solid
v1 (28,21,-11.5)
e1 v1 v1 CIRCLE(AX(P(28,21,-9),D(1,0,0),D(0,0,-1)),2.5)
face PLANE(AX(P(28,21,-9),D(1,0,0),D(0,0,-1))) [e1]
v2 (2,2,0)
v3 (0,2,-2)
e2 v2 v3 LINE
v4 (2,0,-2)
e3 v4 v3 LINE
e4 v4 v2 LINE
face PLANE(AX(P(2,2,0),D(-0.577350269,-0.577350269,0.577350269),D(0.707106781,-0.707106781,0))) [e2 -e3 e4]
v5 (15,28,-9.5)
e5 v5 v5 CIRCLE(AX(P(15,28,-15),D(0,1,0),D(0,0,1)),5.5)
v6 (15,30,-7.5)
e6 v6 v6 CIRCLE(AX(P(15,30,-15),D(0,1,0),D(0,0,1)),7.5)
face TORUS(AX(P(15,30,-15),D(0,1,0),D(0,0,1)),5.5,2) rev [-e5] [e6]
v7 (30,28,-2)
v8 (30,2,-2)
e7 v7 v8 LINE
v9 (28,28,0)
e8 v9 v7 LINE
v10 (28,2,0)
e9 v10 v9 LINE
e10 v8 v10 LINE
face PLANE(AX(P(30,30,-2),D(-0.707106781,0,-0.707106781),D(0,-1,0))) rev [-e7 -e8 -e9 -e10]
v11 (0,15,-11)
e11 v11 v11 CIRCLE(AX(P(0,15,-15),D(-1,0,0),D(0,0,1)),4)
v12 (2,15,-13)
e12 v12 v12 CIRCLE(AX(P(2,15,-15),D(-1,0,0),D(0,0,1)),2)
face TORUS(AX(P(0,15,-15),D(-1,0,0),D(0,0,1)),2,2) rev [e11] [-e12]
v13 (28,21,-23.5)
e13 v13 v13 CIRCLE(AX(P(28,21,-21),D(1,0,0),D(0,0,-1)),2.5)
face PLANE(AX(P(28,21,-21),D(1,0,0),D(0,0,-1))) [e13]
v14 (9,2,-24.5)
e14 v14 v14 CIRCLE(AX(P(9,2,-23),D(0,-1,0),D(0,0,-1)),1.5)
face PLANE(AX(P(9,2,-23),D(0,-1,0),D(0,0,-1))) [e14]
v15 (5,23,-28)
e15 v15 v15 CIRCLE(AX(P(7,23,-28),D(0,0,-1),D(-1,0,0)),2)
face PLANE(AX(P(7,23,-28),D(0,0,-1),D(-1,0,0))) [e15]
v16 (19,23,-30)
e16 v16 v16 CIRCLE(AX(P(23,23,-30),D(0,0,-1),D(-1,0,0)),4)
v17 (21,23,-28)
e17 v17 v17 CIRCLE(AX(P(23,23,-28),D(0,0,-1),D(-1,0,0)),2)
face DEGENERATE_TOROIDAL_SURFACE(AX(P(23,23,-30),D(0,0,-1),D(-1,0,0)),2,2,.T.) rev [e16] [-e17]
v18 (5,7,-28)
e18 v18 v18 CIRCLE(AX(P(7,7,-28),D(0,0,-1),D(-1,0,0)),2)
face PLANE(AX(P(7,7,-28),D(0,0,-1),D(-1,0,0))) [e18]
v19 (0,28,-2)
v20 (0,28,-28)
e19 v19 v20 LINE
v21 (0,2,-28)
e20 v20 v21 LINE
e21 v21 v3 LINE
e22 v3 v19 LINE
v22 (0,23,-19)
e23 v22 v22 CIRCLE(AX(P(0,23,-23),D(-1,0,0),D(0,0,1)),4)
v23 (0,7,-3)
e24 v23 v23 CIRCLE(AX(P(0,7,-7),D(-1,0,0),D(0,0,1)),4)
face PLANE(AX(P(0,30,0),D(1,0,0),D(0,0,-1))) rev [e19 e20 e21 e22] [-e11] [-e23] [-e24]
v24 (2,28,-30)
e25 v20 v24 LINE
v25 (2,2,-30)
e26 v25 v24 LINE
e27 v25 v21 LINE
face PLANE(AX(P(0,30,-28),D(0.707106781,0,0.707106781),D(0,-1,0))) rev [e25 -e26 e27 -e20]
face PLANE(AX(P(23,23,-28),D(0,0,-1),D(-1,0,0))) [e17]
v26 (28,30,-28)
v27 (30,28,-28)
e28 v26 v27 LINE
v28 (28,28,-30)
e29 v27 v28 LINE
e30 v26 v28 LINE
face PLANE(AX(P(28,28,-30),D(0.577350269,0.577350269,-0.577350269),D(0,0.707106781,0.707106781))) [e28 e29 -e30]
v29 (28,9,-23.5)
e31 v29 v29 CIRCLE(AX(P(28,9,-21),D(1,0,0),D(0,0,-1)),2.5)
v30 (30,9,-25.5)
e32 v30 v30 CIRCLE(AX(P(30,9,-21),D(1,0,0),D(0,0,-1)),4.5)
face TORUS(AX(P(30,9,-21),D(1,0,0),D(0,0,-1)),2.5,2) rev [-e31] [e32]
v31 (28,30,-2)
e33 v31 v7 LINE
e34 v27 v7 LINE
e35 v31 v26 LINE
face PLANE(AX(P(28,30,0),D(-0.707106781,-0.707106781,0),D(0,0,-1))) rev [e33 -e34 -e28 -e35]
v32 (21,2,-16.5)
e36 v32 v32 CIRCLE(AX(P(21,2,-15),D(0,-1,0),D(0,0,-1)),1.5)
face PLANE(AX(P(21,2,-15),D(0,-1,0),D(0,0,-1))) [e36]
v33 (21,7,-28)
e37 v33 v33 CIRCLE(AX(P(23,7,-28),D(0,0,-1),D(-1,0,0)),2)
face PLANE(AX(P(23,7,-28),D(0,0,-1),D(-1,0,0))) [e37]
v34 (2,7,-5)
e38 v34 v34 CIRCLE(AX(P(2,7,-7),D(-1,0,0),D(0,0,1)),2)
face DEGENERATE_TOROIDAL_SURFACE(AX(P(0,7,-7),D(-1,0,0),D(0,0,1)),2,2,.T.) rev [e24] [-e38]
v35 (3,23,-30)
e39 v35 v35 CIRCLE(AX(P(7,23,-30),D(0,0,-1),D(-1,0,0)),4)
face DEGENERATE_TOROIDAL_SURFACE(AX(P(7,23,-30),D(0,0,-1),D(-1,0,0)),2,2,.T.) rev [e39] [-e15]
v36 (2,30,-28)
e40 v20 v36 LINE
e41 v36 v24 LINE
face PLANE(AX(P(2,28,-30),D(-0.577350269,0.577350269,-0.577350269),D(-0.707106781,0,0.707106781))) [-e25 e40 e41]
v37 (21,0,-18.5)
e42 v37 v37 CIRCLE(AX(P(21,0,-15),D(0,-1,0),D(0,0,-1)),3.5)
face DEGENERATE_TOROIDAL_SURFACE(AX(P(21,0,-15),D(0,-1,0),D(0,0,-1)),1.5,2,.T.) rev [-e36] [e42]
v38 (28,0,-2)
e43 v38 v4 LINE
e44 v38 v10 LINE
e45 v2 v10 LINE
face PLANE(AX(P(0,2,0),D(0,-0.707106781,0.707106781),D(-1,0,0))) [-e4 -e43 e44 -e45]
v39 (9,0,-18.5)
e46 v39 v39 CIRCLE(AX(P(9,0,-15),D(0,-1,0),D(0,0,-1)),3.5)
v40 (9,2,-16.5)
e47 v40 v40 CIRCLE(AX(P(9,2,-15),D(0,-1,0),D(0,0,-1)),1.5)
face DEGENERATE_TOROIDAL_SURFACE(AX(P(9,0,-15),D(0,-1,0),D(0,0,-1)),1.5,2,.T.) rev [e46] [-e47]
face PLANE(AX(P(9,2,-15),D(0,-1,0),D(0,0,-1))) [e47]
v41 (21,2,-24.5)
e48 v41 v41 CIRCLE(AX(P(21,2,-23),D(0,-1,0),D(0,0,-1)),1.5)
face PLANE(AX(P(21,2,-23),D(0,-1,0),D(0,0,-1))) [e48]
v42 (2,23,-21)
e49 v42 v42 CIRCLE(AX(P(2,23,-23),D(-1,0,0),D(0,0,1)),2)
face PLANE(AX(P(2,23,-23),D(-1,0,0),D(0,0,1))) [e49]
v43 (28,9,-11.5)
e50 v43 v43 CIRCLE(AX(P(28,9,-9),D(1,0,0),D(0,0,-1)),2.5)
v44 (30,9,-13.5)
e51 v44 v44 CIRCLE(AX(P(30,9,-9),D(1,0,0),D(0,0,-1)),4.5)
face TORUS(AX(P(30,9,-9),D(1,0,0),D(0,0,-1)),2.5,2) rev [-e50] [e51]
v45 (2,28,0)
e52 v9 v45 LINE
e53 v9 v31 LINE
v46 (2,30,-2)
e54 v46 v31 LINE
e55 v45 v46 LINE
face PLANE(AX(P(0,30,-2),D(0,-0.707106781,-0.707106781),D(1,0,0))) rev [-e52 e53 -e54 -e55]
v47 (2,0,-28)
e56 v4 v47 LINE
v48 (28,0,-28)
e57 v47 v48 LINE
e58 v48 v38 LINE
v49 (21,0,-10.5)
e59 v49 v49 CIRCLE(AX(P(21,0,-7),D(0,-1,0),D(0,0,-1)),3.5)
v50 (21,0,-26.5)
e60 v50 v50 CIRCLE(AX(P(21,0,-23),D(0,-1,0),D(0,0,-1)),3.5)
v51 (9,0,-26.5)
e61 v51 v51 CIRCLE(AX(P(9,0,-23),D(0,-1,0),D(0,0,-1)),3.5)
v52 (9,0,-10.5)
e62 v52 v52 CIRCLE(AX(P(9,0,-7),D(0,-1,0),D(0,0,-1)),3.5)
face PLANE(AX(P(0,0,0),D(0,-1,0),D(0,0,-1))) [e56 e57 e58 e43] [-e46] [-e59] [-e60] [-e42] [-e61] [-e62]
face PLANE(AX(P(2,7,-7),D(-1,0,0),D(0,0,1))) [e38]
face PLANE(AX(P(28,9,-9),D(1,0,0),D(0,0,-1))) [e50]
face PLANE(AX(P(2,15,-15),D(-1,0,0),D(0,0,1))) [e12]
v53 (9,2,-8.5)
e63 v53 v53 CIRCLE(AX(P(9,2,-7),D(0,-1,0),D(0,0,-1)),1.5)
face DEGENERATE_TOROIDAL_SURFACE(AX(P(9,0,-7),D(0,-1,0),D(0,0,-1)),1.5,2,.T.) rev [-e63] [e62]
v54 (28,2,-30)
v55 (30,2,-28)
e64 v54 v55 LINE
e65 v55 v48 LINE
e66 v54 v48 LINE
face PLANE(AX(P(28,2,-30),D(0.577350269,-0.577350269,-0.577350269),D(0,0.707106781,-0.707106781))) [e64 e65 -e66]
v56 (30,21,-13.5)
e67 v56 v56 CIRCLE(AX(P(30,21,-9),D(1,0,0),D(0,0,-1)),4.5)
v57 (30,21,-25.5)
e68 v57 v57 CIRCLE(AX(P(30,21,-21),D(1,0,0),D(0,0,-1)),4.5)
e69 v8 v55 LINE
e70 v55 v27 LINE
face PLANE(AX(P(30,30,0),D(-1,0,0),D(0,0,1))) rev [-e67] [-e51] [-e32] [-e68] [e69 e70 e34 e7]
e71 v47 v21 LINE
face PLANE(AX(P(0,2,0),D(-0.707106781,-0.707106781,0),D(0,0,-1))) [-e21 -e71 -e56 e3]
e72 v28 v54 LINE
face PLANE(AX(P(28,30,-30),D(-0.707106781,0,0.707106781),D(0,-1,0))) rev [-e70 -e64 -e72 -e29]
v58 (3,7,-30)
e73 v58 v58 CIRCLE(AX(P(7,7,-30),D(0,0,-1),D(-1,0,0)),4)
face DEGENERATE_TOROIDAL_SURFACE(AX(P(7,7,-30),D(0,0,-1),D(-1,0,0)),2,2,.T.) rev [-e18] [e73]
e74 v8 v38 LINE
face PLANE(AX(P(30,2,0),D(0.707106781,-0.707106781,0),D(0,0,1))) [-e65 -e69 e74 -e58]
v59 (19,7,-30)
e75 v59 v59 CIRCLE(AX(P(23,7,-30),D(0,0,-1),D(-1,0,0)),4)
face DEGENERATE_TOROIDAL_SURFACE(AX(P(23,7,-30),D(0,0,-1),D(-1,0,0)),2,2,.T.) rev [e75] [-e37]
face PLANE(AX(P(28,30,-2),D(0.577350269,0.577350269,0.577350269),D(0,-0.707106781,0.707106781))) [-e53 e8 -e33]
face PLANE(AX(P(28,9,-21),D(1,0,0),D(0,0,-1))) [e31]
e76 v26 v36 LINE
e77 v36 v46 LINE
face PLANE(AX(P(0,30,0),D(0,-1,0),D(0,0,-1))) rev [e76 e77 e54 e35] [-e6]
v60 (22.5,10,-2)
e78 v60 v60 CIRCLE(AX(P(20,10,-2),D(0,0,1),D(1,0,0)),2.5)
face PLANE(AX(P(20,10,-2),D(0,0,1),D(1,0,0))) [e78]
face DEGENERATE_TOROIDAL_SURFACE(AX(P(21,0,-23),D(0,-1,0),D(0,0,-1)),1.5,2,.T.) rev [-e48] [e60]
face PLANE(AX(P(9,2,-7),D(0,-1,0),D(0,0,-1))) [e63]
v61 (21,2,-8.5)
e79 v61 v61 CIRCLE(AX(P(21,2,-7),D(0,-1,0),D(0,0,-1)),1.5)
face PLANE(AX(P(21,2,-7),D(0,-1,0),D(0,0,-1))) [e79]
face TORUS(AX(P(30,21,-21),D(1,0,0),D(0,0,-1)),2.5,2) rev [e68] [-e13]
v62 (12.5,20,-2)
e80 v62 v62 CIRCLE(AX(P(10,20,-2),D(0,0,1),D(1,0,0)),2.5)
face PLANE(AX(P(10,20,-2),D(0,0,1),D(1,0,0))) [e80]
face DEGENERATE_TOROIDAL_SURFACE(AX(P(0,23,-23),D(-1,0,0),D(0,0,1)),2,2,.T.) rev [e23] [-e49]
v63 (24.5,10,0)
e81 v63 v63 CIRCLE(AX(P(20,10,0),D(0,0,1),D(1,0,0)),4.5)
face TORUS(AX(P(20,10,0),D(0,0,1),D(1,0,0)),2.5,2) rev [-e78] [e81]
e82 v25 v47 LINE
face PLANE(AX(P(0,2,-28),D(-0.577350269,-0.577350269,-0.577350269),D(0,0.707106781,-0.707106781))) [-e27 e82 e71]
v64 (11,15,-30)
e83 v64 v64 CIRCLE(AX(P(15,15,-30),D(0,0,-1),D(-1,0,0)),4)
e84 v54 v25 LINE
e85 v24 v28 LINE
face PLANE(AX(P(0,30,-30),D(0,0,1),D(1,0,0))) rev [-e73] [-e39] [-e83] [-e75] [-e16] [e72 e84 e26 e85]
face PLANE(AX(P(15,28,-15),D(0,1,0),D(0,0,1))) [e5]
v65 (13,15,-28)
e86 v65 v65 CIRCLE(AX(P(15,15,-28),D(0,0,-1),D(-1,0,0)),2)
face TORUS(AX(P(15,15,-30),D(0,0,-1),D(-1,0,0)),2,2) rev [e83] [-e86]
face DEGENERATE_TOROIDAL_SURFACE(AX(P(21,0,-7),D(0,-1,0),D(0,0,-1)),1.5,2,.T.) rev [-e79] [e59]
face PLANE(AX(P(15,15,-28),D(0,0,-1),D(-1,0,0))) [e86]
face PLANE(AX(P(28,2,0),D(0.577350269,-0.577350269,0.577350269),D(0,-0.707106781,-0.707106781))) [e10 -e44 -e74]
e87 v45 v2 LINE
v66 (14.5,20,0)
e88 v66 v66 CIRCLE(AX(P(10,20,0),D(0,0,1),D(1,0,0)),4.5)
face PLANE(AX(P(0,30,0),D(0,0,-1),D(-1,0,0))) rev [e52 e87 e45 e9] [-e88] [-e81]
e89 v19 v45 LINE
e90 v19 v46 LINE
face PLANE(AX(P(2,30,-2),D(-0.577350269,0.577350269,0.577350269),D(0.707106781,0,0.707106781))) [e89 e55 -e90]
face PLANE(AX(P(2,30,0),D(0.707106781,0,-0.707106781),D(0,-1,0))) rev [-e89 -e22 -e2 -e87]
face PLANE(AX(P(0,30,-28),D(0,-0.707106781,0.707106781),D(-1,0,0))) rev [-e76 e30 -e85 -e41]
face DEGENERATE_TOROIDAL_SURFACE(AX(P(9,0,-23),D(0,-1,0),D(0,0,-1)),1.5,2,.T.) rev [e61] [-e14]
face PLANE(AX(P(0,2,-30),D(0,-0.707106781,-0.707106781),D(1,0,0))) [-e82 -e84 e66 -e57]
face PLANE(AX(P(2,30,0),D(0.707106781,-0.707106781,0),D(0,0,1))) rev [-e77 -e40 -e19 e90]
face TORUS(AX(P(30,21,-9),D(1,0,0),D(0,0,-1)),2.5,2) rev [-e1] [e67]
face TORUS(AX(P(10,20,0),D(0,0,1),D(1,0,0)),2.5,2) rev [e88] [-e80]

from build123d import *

# Parameters (mm, degrees)
SKETCH_3_W          = 30
SKETCH_3_H          = 30
EXTRUDE_2_DEPTH     = 30
CHAMFER_1_SIZE      = 2
SKETCH_5_R          = 7.5
CUT_EXTRUDE_1_DEPTH = 2
FILLET_2_R          = 2
SKETCH_8_R          = 3.5
CUT_EXTRUDE_2_DEPTH = 2
FILLET_3_R          = 2
SKETCH_9_R          = 4.5
CUT_EXTRUDE_3_DEPTH = 2
FILLET_4_R          = 2
SKETCH_10_R         = 4
CUT_EXTRUDE_4_DEPTH = 2
FILLET_5_R          = 2
SKETCH_11_R         = 4
CUT_EXTRUDE_5_DEPTH = 2
FILLET_6_R          = 2
SKETCH_12_R         = 4.5
CUT_EXTRUDE_6_DEPTH = 2
FILLET_7_R          = 2


with BuildPart() as part:
    # ｽｹｯﾁ3 → ﾎﾞｽ - 押し出し2 (new body)
    with BuildSketch(Plane(origin=(0, 0, 0), x_dir=(1, 0, 0), z_dir=(0, 1, 0))):
        with Locations((15, 15)):
            Rectangle(SKETCH_3_W, SKETCH_3_H)
    extrude(amount=EXTRUDE_2_DEPTH)

    # 面取り1
    chamfer_1_edges = [part.edges().sort_by_distance(p)[0] for p in [
        (30, 30, -15),
        (15, 30, -30),
        (0, 30, -15),
        (15, 0, -30),
        (30, 0, -15),
        (15, 0, 0),
        (0, 0, -15),
        (0, 15, -30),
        (30, 15, -30),
        (30, 15, 0),
        (0, 15, 0),
        (15, 30, 0),
    ]]
    chamfer(chamfer_1_edges, length=CHAMFER_1_SIZE)

    # ｽｹｯﾁ5 → ｶｯﾄ - 押し出し1 (cut)
    with BuildSketch(Plane(origin=(0, 30, 0), x_dir=(1, 0, 0), z_dir=(0, 1, 0))):
        with Locations(Location((15, 15, 0), (0, 0, 270))):
            Circle(SKETCH_5_R)
    extrude(amount=-CUT_EXTRUDE_1_DEPTH, mode=Mode.SUBTRACT)

    # ﾌｨﾚｯﾄ2
    fillet_2_edges = [part.edges().sort_by_distance(p)[0] for p in [
        (15, 28, -22.5),
    ]]
    fillet(fillet_2_edges, radius=FILLET_2_R - 0.0001)  # a hair under: the kernel refuses the full size

    # ｽｹｯﾁ8 → ｶｯﾄ - 押し出し2 (cut)
    with BuildSketch(Plane.XZ):
        with Locations(Location((9, -7, 0), (0, 0, 270))):
            Circle(SKETCH_8_R)
        with Locations(Location((9, -15, 0), (0, 0, 270))):
            Circle(SKETCH_8_R)
        with Locations(Location((9, -23, 0), (0, 0, 270))):
            Circle(SKETCH_8_R)
        with Locations(Location((21, -7, 0), (0, 0, 270))):
            Circle(SKETCH_8_R)
        with Locations(Location((21, -15, 0), (0, 0, 270))):
            Circle(SKETCH_8_R)
        with Locations(Location((21, -23, 0), (0, 0, 270))):
            Circle(SKETCH_8_R)
    extrude(amount=-CUT_EXTRUDE_2_DEPTH, mode=Mode.SUBTRACT)

    # ﾌｨﾚｯﾄ3
    fillet_3_edges = [part.edges().sort_by_distance(p)[0] for p in [
        (9, 2, -11.5),
        (9, 2, -19.5),
        (21, 2, -3.5),
        (21, 2, -11.5),
        (21, 2, -19.5),
        (9, 2, -3.5),
    ]]
    fillet(fillet_3_edges, radius=FILLET_3_R - 0.0001)  # a hair under: the kernel refuses the full size

    # ｽｹｯﾁ9 → ｶｯﾄ - 押し出し3 (cut)
    with BuildSketch(Plane.XY):
        with Locations((10, 20)):
            Circle(SKETCH_9_R)
        with Locations((20, 10)):
            Circle(SKETCH_9_R)
    extrude(amount=-CUT_EXTRUDE_3_DEPTH, mode=Mode.SUBTRACT)

    # ﾌｨﾚｯﾄ4
    fillet_4_edges = [part.edges().sort_by_distance(p)[0] for p in [
        (5.5, 20, -2),
        (15.5, 10, -2),
    ]]
    fillet(fillet_4_edges, radius=FILLET_4_R - 0.0001)  # a hair under: the kernel refuses the full size

    # ｽｹｯﾁ10 → ｶｯﾄ - 押し出し4 (cut)
    with BuildSketch(Plane(origin=(0, 0, -30), x_dir=(-1, 0, 0), z_dir=(0, 0, -1))):
        with Locations((-23, 23)):
            Circle(SKETCH_10_R)
        with Locations((-7, 23)):
            Circle(SKETCH_10_R)
        with Locations((-7, 7)):
            Circle(SKETCH_10_R)
        with Locations((-23, 7)):
            Circle(SKETCH_10_R)
        with Locations((-15, 15)):
            Circle(SKETCH_10_R)
    extrude(amount=-CUT_EXTRUDE_4_DEPTH, mode=Mode.SUBTRACT)

    # ﾌｨﾚｯﾄ5
    fillet_5_edges = [part.edges().sort_by_distance(p)[0] for p in [
        (11, 23, -28),
        (11, 7, -28),
        (19, 15, -28),
        (27, 7, -28),
        (27, 23, -28),
    ]]
    fillet(fillet_5_edges, radius=FILLET_5_R - 0.0001)  # a hair under: the kernel refuses the full size

    # ｽｹｯﾁ11 → ｶｯﾄ - 押し出し5 (cut)
    with BuildSketch(Plane.ZY):
        with Locations((-23, 23)):
            Circle(SKETCH_11_R)
        with Locations((-15, 15)):
            Circle(SKETCH_11_R)
        with Locations((-7, 7)):
            Circle(SKETCH_11_R)
    extrude(amount=-CUT_EXTRUDE_5_DEPTH, mode=Mode.SUBTRACT)

    # ﾌｨﾚｯﾄ6
    fillet_6_edges = [part.edges().sort_by_distance(p)[0] for p in [
        (2, 15, -19),
        (2, 7, -11),
        (2, 23, -27),
    ]]
    fillet(fillet_6_edges, radius=FILLET_6_R - 0.0001)  # a hair under: the kernel refuses the full size

    # ｽｹｯﾁ12 → ｶｯﾄ - 押し出し6 (cut)
    with BuildSketch(Plane(origin=(30, 0, 0), x_dir=(0, 0, -1), z_dir=(1, 0, 0))):
        with Locations((9, 21)):
            Circle(SKETCH_12_R)
        with Locations((21, 21)):
            Circle(SKETCH_12_R)
        with Locations((21, 9)):
            Circle(SKETCH_12_R)
        with Locations((9, 9)):
            Circle(SKETCH_12_R)
    extrude(amount=-CUT_EXTRUDE_6_DEPTH, mode=Mode.SUBTRACT)

    # ﾌｨﾚｯﾄ7
    fillet_7_edges = [part.edges().sort_by_distance(p)[0] for p in [
        (28, 9, -4.5),
        (28, 9, -16.5),
        (28, 21, -16.5),
        (28, 21, -4.5),
    ]]
    fillet(fillet_7_edges, radius=FILLET_7_R - 0.0001)  # a hair under: the kernel refuses the full size


solid = part.part
